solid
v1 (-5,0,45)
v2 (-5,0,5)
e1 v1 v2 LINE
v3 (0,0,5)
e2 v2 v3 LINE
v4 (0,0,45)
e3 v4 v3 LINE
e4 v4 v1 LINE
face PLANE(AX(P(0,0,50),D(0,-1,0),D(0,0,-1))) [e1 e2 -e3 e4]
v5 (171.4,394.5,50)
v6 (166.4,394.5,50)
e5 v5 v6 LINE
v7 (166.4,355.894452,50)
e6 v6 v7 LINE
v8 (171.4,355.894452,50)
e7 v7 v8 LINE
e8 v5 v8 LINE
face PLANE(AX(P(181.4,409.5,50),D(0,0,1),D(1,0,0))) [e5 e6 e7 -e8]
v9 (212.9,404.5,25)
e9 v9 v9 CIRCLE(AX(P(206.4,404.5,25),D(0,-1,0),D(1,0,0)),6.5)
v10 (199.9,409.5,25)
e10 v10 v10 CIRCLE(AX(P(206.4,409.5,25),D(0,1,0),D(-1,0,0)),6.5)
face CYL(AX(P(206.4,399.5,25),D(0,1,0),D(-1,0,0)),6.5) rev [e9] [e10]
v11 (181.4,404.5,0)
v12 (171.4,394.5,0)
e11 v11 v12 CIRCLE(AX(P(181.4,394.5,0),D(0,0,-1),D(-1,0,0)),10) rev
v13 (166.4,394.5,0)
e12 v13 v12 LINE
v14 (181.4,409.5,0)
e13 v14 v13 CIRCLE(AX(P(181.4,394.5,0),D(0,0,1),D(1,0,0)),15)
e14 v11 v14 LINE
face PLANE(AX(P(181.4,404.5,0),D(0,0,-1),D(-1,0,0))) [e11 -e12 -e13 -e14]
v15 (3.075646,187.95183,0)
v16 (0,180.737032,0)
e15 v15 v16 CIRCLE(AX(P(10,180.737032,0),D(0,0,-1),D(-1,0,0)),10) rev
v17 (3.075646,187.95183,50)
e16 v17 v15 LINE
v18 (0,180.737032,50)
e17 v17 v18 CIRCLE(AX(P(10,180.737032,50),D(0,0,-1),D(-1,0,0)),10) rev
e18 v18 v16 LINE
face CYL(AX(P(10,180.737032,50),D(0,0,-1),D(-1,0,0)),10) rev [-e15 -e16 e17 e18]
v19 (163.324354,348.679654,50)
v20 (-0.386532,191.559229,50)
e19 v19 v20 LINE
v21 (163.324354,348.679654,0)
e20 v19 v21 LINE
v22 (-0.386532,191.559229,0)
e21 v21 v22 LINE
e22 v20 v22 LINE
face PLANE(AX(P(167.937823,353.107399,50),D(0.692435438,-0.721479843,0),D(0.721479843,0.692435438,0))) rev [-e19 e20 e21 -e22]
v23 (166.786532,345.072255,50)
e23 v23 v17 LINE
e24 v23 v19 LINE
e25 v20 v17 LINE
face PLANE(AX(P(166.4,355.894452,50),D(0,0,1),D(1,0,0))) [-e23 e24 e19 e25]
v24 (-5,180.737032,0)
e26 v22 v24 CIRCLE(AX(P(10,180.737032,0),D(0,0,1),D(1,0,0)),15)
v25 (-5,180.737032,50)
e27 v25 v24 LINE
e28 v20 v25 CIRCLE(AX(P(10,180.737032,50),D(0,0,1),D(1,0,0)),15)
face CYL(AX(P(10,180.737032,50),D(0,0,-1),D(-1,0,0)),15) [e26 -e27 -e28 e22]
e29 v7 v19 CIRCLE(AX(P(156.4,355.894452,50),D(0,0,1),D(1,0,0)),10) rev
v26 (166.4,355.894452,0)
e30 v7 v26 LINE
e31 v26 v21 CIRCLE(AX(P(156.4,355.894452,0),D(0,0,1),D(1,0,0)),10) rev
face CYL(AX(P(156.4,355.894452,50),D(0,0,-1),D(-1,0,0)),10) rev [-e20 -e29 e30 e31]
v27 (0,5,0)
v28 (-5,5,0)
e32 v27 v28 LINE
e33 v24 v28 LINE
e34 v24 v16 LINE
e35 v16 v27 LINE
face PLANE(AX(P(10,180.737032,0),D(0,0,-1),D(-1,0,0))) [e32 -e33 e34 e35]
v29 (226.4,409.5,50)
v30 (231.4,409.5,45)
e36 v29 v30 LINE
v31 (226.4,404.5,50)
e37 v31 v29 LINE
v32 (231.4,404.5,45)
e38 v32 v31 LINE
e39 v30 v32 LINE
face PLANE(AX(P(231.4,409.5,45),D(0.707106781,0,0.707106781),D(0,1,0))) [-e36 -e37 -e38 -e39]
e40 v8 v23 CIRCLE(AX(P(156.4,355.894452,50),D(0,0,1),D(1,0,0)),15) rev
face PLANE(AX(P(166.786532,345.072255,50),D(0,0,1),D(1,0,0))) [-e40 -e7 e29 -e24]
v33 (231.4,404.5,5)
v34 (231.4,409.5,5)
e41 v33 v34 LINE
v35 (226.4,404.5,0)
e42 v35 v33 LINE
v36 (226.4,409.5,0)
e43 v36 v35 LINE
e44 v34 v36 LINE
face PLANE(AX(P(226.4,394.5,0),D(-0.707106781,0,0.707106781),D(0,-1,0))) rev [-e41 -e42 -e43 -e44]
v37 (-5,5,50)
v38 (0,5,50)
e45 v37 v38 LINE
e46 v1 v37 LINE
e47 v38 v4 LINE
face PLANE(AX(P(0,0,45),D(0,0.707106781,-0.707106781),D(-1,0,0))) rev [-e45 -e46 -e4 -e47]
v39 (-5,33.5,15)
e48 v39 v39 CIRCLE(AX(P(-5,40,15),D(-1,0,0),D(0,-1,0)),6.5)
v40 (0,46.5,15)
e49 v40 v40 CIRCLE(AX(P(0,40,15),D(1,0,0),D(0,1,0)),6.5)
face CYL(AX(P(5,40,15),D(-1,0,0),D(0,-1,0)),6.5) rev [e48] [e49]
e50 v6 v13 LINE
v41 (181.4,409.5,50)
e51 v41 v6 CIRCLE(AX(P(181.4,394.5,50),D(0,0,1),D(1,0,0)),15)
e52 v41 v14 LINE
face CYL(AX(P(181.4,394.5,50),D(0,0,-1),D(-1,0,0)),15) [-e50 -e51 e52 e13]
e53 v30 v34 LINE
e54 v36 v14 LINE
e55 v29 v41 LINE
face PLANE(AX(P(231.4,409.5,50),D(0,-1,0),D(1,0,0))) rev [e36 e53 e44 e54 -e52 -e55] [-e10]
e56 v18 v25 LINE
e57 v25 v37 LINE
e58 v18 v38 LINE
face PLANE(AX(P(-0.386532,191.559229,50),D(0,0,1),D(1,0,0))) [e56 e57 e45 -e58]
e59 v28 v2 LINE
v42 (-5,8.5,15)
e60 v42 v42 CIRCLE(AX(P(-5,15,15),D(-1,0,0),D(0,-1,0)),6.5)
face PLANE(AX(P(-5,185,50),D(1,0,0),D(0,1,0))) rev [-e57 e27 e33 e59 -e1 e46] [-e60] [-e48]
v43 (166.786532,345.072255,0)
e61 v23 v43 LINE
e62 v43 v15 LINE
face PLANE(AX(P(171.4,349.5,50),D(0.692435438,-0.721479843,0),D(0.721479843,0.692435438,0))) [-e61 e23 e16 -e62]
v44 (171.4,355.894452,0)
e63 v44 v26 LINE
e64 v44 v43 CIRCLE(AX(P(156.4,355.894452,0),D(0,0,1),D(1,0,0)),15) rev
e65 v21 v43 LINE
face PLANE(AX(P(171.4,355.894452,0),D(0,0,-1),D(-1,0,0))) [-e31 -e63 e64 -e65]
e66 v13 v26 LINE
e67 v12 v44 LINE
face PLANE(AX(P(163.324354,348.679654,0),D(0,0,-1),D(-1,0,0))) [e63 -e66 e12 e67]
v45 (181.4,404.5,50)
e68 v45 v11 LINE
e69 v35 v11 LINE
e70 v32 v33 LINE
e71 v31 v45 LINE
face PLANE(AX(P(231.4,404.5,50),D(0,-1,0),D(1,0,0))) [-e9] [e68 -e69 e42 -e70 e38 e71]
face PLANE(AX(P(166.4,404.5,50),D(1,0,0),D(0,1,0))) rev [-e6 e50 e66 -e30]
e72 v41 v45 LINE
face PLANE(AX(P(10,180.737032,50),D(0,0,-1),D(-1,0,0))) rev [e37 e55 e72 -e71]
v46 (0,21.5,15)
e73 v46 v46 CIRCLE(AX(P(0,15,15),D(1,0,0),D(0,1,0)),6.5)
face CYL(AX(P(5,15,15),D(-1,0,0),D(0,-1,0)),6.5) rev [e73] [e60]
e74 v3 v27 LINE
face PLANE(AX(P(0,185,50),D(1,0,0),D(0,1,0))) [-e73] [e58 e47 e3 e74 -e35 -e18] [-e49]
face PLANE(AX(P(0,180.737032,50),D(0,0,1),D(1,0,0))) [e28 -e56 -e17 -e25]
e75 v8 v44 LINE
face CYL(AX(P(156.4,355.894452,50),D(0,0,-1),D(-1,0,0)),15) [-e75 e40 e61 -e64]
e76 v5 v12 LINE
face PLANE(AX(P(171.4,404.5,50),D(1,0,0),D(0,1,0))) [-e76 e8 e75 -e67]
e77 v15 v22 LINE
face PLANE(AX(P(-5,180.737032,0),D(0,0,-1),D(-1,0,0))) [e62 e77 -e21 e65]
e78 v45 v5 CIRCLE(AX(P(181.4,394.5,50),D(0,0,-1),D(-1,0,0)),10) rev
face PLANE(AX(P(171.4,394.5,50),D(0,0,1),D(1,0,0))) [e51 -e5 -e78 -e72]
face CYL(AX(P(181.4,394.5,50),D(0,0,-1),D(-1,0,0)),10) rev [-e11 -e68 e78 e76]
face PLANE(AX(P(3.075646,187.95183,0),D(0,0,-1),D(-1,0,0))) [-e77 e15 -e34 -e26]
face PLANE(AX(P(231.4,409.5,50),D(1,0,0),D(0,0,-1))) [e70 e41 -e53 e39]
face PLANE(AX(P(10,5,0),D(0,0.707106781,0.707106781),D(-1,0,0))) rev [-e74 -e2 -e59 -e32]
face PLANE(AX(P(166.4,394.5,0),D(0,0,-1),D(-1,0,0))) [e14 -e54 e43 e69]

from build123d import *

# Parameters (mm, degrees)
SM_BASE_FLANGE_1_DEPTH = 50
SKETCH_6_R             = 6.5
CUT_EXTRUDE_1_DEPTH    = 10
SKETCH_7_R             = 6.5
CUT_EXTRUDE_2_DEPTH    = 10
OTHER_START            = 160.088975261
OTHER_1_OUTLINE_W      = 10
OTHER_1_OUTLINE_H      = 8
OTHER_1_DEPTH          = 3.535533906
OTHER_START_2          = 195.44431432
OTHER_1_2_OUTLINE_W    = 39
OTHER_1_2_OUTLINE_H    = 8
OTHER_1_2_DEPTH        = 3.535533906
OTHER_1_3_OUTLINE_W    = 7
OTHER_1_3_OUTLINE_H    = 10
OTHER_1_3_DEPTH        = 3.535533906
OTHER_START_3          = -35.355339059
OTHER_1_4_OUTLINE_W    = 7
OTHER_1_4_OUTLINE_H    = 38
OTHER_1_4_DEPTH        = 3.535533906


# Read off the part's stored shape, not the designer's step: Затупленный угол1
# Sheet-metal steps are written as plain solids
with BuildPart() as part:
    # Sketch 1 → Базовая кромка1 (new body)
    with BuildSketch(Plane.XY):
        with BuildLine():
            Line((231.4, 404.5), (181.4, 404.5))
            ThreePointArc((181.4, 404.5), (174.328932188, 401.571067812), (171.4, 394.5))
            Line((171.4, 394.5), (171.4, 355.894452277))
            ThreePointArc((171.4, 355.894452277), (170.198513935, 350.012189687), (166.786531576, 345.072254634))
            Line((166.786531576, 345.072254634), (3.075645616, 187.951830244))
            ThreePointArc((3.075645616, 187.951830244), (0.80099071, 184.658540209), (0, 180.737031815))
            Line((0, 180.737031815), (0, 0))
            Line((0, 0), (-5, 0))
            Line((-5, 0), (-5, 180.737031815))
            ThreePointArc((-5, 180.737031815), (-3.798513935, 186.619294405), (-0.386531576, 191.559229458))
            Line((-0.386531576, 191.559229458), (163.324354384, 348.679653848))
            ThreePointArc((163.324354384, 348.679653848), (165.59900929, 351.972943883), (166.4, 355.894452277))
            Line((166.4, 355.894452277), (166.4, 394.5))
            ThreePointArc((166.4, 394.5), (170.793398282, 405.106601718), (181.4, 409.5))
            Line((181.4, 409.5), (231.4, 409.5))
            Line((231.4, 409.5), (231.4, 404.5))
        make_face()
    extrude(amount=SM_BASE_FLANGE_1_DEPTH)

    # Эскиз6 → Вырез-Вытянуть1 (cut)
    with BuildSketch(Plane.ZY.offset(5)):
        with Locations(Location((15, 15, 0), (0, 0, 270))):
            Circle(SKETCH_6_R)
        with Locations(Location((15, 40, 0), (0, 0, 270))):
            Circle(SKETCH_6_R)
    extrude(amount=-CUT_EXTRUDE_1_DEPTH, mode=Mode.SUBTRACT)

    # Эскиз7 → Вырез-Вытянуть2 (cut)
    with BuildSketch(Plane(origin=(0, 409.5, 0), x_dir=(1, 0, 0), z_dir=(0, 1, 0))):
        with Locations(Location((206.4, -25, 0), (0, 0, 180))):
            Circle(SKETCH_7_R)
    extrude(amount=-CUT_EXTRUDE_2_DEPTH, mode=Mode.SUBTRACT)

    # Other 1 outline → Other 1 (cut)
    with BuildSketch(Plane(origin=(0, 0, 0), x_dir=(0.707106781186548, 0, 0.707106781186547), z_dir=(0.707106781186547, 0, -0.707106781186548)).offset(OTHER_START)):
        with Locations((164, -407)):
            Rectangle(OTHER_1_OUTLINE_W, OTHER_1_OUTLINE_H)
    extrude(amount=OTHER_1_DEPTH, mode=Mode.SUBTRACT)

    # Other 1 2 outline → Other 1 2 (cut)
    with BuildSketch(Plane(origin=(0, 0, 0), x_dir=(0.707106781186548, 0, -0.707106781186547), z_dir=(0.707106781186547, 0, 0.707106781186548)).offset(OTHER_START_2)):
        with Locations((142.5, 407)):
            Rectangle(OTHER_1_2_OUTLINE_W, OTHER_1_2_OUTLINE_H)
    extrude(amount=OTHER_1_2_DEPTH, mode=Mode.SUBTRACT)

    # Other 1 3 outline → Other 1 3 (cut)
    with BuildSketch(Plane(origin=(0, 0, 0), x_dir=(1, 0, 0), z_dir=(0, 0.707106781186547, 0.707106781186548))):
        with Locations((-2.5, 0)):
            Rectangle(OTHER_1_3_OUTLINE_W, OTHER_1_3_OUTLINE_H)
    extrude(amount=OTHER_1_3_DEPTH, mode=Mode.SUBTRACT)

    # Other 1 4 outline → Other 1 4 (cut)
    with BuildSketch(Plane(origin=(0, 0, 0), x_dir=(1, 0, 0), z_dir=(0, 0.707106781186547, -0.707106781186548)).offset(OTHER_START_3)):
        with Locations((-2.5, -21)):
            Rectangle(OTHER_1_4_OUTLINE_W, OTHER_1_4_OUTLINE_H)
    extrude(amount=OTHER_1_4_DEPTH, mode=Mode.SUBTRACT)


solid = part.part
